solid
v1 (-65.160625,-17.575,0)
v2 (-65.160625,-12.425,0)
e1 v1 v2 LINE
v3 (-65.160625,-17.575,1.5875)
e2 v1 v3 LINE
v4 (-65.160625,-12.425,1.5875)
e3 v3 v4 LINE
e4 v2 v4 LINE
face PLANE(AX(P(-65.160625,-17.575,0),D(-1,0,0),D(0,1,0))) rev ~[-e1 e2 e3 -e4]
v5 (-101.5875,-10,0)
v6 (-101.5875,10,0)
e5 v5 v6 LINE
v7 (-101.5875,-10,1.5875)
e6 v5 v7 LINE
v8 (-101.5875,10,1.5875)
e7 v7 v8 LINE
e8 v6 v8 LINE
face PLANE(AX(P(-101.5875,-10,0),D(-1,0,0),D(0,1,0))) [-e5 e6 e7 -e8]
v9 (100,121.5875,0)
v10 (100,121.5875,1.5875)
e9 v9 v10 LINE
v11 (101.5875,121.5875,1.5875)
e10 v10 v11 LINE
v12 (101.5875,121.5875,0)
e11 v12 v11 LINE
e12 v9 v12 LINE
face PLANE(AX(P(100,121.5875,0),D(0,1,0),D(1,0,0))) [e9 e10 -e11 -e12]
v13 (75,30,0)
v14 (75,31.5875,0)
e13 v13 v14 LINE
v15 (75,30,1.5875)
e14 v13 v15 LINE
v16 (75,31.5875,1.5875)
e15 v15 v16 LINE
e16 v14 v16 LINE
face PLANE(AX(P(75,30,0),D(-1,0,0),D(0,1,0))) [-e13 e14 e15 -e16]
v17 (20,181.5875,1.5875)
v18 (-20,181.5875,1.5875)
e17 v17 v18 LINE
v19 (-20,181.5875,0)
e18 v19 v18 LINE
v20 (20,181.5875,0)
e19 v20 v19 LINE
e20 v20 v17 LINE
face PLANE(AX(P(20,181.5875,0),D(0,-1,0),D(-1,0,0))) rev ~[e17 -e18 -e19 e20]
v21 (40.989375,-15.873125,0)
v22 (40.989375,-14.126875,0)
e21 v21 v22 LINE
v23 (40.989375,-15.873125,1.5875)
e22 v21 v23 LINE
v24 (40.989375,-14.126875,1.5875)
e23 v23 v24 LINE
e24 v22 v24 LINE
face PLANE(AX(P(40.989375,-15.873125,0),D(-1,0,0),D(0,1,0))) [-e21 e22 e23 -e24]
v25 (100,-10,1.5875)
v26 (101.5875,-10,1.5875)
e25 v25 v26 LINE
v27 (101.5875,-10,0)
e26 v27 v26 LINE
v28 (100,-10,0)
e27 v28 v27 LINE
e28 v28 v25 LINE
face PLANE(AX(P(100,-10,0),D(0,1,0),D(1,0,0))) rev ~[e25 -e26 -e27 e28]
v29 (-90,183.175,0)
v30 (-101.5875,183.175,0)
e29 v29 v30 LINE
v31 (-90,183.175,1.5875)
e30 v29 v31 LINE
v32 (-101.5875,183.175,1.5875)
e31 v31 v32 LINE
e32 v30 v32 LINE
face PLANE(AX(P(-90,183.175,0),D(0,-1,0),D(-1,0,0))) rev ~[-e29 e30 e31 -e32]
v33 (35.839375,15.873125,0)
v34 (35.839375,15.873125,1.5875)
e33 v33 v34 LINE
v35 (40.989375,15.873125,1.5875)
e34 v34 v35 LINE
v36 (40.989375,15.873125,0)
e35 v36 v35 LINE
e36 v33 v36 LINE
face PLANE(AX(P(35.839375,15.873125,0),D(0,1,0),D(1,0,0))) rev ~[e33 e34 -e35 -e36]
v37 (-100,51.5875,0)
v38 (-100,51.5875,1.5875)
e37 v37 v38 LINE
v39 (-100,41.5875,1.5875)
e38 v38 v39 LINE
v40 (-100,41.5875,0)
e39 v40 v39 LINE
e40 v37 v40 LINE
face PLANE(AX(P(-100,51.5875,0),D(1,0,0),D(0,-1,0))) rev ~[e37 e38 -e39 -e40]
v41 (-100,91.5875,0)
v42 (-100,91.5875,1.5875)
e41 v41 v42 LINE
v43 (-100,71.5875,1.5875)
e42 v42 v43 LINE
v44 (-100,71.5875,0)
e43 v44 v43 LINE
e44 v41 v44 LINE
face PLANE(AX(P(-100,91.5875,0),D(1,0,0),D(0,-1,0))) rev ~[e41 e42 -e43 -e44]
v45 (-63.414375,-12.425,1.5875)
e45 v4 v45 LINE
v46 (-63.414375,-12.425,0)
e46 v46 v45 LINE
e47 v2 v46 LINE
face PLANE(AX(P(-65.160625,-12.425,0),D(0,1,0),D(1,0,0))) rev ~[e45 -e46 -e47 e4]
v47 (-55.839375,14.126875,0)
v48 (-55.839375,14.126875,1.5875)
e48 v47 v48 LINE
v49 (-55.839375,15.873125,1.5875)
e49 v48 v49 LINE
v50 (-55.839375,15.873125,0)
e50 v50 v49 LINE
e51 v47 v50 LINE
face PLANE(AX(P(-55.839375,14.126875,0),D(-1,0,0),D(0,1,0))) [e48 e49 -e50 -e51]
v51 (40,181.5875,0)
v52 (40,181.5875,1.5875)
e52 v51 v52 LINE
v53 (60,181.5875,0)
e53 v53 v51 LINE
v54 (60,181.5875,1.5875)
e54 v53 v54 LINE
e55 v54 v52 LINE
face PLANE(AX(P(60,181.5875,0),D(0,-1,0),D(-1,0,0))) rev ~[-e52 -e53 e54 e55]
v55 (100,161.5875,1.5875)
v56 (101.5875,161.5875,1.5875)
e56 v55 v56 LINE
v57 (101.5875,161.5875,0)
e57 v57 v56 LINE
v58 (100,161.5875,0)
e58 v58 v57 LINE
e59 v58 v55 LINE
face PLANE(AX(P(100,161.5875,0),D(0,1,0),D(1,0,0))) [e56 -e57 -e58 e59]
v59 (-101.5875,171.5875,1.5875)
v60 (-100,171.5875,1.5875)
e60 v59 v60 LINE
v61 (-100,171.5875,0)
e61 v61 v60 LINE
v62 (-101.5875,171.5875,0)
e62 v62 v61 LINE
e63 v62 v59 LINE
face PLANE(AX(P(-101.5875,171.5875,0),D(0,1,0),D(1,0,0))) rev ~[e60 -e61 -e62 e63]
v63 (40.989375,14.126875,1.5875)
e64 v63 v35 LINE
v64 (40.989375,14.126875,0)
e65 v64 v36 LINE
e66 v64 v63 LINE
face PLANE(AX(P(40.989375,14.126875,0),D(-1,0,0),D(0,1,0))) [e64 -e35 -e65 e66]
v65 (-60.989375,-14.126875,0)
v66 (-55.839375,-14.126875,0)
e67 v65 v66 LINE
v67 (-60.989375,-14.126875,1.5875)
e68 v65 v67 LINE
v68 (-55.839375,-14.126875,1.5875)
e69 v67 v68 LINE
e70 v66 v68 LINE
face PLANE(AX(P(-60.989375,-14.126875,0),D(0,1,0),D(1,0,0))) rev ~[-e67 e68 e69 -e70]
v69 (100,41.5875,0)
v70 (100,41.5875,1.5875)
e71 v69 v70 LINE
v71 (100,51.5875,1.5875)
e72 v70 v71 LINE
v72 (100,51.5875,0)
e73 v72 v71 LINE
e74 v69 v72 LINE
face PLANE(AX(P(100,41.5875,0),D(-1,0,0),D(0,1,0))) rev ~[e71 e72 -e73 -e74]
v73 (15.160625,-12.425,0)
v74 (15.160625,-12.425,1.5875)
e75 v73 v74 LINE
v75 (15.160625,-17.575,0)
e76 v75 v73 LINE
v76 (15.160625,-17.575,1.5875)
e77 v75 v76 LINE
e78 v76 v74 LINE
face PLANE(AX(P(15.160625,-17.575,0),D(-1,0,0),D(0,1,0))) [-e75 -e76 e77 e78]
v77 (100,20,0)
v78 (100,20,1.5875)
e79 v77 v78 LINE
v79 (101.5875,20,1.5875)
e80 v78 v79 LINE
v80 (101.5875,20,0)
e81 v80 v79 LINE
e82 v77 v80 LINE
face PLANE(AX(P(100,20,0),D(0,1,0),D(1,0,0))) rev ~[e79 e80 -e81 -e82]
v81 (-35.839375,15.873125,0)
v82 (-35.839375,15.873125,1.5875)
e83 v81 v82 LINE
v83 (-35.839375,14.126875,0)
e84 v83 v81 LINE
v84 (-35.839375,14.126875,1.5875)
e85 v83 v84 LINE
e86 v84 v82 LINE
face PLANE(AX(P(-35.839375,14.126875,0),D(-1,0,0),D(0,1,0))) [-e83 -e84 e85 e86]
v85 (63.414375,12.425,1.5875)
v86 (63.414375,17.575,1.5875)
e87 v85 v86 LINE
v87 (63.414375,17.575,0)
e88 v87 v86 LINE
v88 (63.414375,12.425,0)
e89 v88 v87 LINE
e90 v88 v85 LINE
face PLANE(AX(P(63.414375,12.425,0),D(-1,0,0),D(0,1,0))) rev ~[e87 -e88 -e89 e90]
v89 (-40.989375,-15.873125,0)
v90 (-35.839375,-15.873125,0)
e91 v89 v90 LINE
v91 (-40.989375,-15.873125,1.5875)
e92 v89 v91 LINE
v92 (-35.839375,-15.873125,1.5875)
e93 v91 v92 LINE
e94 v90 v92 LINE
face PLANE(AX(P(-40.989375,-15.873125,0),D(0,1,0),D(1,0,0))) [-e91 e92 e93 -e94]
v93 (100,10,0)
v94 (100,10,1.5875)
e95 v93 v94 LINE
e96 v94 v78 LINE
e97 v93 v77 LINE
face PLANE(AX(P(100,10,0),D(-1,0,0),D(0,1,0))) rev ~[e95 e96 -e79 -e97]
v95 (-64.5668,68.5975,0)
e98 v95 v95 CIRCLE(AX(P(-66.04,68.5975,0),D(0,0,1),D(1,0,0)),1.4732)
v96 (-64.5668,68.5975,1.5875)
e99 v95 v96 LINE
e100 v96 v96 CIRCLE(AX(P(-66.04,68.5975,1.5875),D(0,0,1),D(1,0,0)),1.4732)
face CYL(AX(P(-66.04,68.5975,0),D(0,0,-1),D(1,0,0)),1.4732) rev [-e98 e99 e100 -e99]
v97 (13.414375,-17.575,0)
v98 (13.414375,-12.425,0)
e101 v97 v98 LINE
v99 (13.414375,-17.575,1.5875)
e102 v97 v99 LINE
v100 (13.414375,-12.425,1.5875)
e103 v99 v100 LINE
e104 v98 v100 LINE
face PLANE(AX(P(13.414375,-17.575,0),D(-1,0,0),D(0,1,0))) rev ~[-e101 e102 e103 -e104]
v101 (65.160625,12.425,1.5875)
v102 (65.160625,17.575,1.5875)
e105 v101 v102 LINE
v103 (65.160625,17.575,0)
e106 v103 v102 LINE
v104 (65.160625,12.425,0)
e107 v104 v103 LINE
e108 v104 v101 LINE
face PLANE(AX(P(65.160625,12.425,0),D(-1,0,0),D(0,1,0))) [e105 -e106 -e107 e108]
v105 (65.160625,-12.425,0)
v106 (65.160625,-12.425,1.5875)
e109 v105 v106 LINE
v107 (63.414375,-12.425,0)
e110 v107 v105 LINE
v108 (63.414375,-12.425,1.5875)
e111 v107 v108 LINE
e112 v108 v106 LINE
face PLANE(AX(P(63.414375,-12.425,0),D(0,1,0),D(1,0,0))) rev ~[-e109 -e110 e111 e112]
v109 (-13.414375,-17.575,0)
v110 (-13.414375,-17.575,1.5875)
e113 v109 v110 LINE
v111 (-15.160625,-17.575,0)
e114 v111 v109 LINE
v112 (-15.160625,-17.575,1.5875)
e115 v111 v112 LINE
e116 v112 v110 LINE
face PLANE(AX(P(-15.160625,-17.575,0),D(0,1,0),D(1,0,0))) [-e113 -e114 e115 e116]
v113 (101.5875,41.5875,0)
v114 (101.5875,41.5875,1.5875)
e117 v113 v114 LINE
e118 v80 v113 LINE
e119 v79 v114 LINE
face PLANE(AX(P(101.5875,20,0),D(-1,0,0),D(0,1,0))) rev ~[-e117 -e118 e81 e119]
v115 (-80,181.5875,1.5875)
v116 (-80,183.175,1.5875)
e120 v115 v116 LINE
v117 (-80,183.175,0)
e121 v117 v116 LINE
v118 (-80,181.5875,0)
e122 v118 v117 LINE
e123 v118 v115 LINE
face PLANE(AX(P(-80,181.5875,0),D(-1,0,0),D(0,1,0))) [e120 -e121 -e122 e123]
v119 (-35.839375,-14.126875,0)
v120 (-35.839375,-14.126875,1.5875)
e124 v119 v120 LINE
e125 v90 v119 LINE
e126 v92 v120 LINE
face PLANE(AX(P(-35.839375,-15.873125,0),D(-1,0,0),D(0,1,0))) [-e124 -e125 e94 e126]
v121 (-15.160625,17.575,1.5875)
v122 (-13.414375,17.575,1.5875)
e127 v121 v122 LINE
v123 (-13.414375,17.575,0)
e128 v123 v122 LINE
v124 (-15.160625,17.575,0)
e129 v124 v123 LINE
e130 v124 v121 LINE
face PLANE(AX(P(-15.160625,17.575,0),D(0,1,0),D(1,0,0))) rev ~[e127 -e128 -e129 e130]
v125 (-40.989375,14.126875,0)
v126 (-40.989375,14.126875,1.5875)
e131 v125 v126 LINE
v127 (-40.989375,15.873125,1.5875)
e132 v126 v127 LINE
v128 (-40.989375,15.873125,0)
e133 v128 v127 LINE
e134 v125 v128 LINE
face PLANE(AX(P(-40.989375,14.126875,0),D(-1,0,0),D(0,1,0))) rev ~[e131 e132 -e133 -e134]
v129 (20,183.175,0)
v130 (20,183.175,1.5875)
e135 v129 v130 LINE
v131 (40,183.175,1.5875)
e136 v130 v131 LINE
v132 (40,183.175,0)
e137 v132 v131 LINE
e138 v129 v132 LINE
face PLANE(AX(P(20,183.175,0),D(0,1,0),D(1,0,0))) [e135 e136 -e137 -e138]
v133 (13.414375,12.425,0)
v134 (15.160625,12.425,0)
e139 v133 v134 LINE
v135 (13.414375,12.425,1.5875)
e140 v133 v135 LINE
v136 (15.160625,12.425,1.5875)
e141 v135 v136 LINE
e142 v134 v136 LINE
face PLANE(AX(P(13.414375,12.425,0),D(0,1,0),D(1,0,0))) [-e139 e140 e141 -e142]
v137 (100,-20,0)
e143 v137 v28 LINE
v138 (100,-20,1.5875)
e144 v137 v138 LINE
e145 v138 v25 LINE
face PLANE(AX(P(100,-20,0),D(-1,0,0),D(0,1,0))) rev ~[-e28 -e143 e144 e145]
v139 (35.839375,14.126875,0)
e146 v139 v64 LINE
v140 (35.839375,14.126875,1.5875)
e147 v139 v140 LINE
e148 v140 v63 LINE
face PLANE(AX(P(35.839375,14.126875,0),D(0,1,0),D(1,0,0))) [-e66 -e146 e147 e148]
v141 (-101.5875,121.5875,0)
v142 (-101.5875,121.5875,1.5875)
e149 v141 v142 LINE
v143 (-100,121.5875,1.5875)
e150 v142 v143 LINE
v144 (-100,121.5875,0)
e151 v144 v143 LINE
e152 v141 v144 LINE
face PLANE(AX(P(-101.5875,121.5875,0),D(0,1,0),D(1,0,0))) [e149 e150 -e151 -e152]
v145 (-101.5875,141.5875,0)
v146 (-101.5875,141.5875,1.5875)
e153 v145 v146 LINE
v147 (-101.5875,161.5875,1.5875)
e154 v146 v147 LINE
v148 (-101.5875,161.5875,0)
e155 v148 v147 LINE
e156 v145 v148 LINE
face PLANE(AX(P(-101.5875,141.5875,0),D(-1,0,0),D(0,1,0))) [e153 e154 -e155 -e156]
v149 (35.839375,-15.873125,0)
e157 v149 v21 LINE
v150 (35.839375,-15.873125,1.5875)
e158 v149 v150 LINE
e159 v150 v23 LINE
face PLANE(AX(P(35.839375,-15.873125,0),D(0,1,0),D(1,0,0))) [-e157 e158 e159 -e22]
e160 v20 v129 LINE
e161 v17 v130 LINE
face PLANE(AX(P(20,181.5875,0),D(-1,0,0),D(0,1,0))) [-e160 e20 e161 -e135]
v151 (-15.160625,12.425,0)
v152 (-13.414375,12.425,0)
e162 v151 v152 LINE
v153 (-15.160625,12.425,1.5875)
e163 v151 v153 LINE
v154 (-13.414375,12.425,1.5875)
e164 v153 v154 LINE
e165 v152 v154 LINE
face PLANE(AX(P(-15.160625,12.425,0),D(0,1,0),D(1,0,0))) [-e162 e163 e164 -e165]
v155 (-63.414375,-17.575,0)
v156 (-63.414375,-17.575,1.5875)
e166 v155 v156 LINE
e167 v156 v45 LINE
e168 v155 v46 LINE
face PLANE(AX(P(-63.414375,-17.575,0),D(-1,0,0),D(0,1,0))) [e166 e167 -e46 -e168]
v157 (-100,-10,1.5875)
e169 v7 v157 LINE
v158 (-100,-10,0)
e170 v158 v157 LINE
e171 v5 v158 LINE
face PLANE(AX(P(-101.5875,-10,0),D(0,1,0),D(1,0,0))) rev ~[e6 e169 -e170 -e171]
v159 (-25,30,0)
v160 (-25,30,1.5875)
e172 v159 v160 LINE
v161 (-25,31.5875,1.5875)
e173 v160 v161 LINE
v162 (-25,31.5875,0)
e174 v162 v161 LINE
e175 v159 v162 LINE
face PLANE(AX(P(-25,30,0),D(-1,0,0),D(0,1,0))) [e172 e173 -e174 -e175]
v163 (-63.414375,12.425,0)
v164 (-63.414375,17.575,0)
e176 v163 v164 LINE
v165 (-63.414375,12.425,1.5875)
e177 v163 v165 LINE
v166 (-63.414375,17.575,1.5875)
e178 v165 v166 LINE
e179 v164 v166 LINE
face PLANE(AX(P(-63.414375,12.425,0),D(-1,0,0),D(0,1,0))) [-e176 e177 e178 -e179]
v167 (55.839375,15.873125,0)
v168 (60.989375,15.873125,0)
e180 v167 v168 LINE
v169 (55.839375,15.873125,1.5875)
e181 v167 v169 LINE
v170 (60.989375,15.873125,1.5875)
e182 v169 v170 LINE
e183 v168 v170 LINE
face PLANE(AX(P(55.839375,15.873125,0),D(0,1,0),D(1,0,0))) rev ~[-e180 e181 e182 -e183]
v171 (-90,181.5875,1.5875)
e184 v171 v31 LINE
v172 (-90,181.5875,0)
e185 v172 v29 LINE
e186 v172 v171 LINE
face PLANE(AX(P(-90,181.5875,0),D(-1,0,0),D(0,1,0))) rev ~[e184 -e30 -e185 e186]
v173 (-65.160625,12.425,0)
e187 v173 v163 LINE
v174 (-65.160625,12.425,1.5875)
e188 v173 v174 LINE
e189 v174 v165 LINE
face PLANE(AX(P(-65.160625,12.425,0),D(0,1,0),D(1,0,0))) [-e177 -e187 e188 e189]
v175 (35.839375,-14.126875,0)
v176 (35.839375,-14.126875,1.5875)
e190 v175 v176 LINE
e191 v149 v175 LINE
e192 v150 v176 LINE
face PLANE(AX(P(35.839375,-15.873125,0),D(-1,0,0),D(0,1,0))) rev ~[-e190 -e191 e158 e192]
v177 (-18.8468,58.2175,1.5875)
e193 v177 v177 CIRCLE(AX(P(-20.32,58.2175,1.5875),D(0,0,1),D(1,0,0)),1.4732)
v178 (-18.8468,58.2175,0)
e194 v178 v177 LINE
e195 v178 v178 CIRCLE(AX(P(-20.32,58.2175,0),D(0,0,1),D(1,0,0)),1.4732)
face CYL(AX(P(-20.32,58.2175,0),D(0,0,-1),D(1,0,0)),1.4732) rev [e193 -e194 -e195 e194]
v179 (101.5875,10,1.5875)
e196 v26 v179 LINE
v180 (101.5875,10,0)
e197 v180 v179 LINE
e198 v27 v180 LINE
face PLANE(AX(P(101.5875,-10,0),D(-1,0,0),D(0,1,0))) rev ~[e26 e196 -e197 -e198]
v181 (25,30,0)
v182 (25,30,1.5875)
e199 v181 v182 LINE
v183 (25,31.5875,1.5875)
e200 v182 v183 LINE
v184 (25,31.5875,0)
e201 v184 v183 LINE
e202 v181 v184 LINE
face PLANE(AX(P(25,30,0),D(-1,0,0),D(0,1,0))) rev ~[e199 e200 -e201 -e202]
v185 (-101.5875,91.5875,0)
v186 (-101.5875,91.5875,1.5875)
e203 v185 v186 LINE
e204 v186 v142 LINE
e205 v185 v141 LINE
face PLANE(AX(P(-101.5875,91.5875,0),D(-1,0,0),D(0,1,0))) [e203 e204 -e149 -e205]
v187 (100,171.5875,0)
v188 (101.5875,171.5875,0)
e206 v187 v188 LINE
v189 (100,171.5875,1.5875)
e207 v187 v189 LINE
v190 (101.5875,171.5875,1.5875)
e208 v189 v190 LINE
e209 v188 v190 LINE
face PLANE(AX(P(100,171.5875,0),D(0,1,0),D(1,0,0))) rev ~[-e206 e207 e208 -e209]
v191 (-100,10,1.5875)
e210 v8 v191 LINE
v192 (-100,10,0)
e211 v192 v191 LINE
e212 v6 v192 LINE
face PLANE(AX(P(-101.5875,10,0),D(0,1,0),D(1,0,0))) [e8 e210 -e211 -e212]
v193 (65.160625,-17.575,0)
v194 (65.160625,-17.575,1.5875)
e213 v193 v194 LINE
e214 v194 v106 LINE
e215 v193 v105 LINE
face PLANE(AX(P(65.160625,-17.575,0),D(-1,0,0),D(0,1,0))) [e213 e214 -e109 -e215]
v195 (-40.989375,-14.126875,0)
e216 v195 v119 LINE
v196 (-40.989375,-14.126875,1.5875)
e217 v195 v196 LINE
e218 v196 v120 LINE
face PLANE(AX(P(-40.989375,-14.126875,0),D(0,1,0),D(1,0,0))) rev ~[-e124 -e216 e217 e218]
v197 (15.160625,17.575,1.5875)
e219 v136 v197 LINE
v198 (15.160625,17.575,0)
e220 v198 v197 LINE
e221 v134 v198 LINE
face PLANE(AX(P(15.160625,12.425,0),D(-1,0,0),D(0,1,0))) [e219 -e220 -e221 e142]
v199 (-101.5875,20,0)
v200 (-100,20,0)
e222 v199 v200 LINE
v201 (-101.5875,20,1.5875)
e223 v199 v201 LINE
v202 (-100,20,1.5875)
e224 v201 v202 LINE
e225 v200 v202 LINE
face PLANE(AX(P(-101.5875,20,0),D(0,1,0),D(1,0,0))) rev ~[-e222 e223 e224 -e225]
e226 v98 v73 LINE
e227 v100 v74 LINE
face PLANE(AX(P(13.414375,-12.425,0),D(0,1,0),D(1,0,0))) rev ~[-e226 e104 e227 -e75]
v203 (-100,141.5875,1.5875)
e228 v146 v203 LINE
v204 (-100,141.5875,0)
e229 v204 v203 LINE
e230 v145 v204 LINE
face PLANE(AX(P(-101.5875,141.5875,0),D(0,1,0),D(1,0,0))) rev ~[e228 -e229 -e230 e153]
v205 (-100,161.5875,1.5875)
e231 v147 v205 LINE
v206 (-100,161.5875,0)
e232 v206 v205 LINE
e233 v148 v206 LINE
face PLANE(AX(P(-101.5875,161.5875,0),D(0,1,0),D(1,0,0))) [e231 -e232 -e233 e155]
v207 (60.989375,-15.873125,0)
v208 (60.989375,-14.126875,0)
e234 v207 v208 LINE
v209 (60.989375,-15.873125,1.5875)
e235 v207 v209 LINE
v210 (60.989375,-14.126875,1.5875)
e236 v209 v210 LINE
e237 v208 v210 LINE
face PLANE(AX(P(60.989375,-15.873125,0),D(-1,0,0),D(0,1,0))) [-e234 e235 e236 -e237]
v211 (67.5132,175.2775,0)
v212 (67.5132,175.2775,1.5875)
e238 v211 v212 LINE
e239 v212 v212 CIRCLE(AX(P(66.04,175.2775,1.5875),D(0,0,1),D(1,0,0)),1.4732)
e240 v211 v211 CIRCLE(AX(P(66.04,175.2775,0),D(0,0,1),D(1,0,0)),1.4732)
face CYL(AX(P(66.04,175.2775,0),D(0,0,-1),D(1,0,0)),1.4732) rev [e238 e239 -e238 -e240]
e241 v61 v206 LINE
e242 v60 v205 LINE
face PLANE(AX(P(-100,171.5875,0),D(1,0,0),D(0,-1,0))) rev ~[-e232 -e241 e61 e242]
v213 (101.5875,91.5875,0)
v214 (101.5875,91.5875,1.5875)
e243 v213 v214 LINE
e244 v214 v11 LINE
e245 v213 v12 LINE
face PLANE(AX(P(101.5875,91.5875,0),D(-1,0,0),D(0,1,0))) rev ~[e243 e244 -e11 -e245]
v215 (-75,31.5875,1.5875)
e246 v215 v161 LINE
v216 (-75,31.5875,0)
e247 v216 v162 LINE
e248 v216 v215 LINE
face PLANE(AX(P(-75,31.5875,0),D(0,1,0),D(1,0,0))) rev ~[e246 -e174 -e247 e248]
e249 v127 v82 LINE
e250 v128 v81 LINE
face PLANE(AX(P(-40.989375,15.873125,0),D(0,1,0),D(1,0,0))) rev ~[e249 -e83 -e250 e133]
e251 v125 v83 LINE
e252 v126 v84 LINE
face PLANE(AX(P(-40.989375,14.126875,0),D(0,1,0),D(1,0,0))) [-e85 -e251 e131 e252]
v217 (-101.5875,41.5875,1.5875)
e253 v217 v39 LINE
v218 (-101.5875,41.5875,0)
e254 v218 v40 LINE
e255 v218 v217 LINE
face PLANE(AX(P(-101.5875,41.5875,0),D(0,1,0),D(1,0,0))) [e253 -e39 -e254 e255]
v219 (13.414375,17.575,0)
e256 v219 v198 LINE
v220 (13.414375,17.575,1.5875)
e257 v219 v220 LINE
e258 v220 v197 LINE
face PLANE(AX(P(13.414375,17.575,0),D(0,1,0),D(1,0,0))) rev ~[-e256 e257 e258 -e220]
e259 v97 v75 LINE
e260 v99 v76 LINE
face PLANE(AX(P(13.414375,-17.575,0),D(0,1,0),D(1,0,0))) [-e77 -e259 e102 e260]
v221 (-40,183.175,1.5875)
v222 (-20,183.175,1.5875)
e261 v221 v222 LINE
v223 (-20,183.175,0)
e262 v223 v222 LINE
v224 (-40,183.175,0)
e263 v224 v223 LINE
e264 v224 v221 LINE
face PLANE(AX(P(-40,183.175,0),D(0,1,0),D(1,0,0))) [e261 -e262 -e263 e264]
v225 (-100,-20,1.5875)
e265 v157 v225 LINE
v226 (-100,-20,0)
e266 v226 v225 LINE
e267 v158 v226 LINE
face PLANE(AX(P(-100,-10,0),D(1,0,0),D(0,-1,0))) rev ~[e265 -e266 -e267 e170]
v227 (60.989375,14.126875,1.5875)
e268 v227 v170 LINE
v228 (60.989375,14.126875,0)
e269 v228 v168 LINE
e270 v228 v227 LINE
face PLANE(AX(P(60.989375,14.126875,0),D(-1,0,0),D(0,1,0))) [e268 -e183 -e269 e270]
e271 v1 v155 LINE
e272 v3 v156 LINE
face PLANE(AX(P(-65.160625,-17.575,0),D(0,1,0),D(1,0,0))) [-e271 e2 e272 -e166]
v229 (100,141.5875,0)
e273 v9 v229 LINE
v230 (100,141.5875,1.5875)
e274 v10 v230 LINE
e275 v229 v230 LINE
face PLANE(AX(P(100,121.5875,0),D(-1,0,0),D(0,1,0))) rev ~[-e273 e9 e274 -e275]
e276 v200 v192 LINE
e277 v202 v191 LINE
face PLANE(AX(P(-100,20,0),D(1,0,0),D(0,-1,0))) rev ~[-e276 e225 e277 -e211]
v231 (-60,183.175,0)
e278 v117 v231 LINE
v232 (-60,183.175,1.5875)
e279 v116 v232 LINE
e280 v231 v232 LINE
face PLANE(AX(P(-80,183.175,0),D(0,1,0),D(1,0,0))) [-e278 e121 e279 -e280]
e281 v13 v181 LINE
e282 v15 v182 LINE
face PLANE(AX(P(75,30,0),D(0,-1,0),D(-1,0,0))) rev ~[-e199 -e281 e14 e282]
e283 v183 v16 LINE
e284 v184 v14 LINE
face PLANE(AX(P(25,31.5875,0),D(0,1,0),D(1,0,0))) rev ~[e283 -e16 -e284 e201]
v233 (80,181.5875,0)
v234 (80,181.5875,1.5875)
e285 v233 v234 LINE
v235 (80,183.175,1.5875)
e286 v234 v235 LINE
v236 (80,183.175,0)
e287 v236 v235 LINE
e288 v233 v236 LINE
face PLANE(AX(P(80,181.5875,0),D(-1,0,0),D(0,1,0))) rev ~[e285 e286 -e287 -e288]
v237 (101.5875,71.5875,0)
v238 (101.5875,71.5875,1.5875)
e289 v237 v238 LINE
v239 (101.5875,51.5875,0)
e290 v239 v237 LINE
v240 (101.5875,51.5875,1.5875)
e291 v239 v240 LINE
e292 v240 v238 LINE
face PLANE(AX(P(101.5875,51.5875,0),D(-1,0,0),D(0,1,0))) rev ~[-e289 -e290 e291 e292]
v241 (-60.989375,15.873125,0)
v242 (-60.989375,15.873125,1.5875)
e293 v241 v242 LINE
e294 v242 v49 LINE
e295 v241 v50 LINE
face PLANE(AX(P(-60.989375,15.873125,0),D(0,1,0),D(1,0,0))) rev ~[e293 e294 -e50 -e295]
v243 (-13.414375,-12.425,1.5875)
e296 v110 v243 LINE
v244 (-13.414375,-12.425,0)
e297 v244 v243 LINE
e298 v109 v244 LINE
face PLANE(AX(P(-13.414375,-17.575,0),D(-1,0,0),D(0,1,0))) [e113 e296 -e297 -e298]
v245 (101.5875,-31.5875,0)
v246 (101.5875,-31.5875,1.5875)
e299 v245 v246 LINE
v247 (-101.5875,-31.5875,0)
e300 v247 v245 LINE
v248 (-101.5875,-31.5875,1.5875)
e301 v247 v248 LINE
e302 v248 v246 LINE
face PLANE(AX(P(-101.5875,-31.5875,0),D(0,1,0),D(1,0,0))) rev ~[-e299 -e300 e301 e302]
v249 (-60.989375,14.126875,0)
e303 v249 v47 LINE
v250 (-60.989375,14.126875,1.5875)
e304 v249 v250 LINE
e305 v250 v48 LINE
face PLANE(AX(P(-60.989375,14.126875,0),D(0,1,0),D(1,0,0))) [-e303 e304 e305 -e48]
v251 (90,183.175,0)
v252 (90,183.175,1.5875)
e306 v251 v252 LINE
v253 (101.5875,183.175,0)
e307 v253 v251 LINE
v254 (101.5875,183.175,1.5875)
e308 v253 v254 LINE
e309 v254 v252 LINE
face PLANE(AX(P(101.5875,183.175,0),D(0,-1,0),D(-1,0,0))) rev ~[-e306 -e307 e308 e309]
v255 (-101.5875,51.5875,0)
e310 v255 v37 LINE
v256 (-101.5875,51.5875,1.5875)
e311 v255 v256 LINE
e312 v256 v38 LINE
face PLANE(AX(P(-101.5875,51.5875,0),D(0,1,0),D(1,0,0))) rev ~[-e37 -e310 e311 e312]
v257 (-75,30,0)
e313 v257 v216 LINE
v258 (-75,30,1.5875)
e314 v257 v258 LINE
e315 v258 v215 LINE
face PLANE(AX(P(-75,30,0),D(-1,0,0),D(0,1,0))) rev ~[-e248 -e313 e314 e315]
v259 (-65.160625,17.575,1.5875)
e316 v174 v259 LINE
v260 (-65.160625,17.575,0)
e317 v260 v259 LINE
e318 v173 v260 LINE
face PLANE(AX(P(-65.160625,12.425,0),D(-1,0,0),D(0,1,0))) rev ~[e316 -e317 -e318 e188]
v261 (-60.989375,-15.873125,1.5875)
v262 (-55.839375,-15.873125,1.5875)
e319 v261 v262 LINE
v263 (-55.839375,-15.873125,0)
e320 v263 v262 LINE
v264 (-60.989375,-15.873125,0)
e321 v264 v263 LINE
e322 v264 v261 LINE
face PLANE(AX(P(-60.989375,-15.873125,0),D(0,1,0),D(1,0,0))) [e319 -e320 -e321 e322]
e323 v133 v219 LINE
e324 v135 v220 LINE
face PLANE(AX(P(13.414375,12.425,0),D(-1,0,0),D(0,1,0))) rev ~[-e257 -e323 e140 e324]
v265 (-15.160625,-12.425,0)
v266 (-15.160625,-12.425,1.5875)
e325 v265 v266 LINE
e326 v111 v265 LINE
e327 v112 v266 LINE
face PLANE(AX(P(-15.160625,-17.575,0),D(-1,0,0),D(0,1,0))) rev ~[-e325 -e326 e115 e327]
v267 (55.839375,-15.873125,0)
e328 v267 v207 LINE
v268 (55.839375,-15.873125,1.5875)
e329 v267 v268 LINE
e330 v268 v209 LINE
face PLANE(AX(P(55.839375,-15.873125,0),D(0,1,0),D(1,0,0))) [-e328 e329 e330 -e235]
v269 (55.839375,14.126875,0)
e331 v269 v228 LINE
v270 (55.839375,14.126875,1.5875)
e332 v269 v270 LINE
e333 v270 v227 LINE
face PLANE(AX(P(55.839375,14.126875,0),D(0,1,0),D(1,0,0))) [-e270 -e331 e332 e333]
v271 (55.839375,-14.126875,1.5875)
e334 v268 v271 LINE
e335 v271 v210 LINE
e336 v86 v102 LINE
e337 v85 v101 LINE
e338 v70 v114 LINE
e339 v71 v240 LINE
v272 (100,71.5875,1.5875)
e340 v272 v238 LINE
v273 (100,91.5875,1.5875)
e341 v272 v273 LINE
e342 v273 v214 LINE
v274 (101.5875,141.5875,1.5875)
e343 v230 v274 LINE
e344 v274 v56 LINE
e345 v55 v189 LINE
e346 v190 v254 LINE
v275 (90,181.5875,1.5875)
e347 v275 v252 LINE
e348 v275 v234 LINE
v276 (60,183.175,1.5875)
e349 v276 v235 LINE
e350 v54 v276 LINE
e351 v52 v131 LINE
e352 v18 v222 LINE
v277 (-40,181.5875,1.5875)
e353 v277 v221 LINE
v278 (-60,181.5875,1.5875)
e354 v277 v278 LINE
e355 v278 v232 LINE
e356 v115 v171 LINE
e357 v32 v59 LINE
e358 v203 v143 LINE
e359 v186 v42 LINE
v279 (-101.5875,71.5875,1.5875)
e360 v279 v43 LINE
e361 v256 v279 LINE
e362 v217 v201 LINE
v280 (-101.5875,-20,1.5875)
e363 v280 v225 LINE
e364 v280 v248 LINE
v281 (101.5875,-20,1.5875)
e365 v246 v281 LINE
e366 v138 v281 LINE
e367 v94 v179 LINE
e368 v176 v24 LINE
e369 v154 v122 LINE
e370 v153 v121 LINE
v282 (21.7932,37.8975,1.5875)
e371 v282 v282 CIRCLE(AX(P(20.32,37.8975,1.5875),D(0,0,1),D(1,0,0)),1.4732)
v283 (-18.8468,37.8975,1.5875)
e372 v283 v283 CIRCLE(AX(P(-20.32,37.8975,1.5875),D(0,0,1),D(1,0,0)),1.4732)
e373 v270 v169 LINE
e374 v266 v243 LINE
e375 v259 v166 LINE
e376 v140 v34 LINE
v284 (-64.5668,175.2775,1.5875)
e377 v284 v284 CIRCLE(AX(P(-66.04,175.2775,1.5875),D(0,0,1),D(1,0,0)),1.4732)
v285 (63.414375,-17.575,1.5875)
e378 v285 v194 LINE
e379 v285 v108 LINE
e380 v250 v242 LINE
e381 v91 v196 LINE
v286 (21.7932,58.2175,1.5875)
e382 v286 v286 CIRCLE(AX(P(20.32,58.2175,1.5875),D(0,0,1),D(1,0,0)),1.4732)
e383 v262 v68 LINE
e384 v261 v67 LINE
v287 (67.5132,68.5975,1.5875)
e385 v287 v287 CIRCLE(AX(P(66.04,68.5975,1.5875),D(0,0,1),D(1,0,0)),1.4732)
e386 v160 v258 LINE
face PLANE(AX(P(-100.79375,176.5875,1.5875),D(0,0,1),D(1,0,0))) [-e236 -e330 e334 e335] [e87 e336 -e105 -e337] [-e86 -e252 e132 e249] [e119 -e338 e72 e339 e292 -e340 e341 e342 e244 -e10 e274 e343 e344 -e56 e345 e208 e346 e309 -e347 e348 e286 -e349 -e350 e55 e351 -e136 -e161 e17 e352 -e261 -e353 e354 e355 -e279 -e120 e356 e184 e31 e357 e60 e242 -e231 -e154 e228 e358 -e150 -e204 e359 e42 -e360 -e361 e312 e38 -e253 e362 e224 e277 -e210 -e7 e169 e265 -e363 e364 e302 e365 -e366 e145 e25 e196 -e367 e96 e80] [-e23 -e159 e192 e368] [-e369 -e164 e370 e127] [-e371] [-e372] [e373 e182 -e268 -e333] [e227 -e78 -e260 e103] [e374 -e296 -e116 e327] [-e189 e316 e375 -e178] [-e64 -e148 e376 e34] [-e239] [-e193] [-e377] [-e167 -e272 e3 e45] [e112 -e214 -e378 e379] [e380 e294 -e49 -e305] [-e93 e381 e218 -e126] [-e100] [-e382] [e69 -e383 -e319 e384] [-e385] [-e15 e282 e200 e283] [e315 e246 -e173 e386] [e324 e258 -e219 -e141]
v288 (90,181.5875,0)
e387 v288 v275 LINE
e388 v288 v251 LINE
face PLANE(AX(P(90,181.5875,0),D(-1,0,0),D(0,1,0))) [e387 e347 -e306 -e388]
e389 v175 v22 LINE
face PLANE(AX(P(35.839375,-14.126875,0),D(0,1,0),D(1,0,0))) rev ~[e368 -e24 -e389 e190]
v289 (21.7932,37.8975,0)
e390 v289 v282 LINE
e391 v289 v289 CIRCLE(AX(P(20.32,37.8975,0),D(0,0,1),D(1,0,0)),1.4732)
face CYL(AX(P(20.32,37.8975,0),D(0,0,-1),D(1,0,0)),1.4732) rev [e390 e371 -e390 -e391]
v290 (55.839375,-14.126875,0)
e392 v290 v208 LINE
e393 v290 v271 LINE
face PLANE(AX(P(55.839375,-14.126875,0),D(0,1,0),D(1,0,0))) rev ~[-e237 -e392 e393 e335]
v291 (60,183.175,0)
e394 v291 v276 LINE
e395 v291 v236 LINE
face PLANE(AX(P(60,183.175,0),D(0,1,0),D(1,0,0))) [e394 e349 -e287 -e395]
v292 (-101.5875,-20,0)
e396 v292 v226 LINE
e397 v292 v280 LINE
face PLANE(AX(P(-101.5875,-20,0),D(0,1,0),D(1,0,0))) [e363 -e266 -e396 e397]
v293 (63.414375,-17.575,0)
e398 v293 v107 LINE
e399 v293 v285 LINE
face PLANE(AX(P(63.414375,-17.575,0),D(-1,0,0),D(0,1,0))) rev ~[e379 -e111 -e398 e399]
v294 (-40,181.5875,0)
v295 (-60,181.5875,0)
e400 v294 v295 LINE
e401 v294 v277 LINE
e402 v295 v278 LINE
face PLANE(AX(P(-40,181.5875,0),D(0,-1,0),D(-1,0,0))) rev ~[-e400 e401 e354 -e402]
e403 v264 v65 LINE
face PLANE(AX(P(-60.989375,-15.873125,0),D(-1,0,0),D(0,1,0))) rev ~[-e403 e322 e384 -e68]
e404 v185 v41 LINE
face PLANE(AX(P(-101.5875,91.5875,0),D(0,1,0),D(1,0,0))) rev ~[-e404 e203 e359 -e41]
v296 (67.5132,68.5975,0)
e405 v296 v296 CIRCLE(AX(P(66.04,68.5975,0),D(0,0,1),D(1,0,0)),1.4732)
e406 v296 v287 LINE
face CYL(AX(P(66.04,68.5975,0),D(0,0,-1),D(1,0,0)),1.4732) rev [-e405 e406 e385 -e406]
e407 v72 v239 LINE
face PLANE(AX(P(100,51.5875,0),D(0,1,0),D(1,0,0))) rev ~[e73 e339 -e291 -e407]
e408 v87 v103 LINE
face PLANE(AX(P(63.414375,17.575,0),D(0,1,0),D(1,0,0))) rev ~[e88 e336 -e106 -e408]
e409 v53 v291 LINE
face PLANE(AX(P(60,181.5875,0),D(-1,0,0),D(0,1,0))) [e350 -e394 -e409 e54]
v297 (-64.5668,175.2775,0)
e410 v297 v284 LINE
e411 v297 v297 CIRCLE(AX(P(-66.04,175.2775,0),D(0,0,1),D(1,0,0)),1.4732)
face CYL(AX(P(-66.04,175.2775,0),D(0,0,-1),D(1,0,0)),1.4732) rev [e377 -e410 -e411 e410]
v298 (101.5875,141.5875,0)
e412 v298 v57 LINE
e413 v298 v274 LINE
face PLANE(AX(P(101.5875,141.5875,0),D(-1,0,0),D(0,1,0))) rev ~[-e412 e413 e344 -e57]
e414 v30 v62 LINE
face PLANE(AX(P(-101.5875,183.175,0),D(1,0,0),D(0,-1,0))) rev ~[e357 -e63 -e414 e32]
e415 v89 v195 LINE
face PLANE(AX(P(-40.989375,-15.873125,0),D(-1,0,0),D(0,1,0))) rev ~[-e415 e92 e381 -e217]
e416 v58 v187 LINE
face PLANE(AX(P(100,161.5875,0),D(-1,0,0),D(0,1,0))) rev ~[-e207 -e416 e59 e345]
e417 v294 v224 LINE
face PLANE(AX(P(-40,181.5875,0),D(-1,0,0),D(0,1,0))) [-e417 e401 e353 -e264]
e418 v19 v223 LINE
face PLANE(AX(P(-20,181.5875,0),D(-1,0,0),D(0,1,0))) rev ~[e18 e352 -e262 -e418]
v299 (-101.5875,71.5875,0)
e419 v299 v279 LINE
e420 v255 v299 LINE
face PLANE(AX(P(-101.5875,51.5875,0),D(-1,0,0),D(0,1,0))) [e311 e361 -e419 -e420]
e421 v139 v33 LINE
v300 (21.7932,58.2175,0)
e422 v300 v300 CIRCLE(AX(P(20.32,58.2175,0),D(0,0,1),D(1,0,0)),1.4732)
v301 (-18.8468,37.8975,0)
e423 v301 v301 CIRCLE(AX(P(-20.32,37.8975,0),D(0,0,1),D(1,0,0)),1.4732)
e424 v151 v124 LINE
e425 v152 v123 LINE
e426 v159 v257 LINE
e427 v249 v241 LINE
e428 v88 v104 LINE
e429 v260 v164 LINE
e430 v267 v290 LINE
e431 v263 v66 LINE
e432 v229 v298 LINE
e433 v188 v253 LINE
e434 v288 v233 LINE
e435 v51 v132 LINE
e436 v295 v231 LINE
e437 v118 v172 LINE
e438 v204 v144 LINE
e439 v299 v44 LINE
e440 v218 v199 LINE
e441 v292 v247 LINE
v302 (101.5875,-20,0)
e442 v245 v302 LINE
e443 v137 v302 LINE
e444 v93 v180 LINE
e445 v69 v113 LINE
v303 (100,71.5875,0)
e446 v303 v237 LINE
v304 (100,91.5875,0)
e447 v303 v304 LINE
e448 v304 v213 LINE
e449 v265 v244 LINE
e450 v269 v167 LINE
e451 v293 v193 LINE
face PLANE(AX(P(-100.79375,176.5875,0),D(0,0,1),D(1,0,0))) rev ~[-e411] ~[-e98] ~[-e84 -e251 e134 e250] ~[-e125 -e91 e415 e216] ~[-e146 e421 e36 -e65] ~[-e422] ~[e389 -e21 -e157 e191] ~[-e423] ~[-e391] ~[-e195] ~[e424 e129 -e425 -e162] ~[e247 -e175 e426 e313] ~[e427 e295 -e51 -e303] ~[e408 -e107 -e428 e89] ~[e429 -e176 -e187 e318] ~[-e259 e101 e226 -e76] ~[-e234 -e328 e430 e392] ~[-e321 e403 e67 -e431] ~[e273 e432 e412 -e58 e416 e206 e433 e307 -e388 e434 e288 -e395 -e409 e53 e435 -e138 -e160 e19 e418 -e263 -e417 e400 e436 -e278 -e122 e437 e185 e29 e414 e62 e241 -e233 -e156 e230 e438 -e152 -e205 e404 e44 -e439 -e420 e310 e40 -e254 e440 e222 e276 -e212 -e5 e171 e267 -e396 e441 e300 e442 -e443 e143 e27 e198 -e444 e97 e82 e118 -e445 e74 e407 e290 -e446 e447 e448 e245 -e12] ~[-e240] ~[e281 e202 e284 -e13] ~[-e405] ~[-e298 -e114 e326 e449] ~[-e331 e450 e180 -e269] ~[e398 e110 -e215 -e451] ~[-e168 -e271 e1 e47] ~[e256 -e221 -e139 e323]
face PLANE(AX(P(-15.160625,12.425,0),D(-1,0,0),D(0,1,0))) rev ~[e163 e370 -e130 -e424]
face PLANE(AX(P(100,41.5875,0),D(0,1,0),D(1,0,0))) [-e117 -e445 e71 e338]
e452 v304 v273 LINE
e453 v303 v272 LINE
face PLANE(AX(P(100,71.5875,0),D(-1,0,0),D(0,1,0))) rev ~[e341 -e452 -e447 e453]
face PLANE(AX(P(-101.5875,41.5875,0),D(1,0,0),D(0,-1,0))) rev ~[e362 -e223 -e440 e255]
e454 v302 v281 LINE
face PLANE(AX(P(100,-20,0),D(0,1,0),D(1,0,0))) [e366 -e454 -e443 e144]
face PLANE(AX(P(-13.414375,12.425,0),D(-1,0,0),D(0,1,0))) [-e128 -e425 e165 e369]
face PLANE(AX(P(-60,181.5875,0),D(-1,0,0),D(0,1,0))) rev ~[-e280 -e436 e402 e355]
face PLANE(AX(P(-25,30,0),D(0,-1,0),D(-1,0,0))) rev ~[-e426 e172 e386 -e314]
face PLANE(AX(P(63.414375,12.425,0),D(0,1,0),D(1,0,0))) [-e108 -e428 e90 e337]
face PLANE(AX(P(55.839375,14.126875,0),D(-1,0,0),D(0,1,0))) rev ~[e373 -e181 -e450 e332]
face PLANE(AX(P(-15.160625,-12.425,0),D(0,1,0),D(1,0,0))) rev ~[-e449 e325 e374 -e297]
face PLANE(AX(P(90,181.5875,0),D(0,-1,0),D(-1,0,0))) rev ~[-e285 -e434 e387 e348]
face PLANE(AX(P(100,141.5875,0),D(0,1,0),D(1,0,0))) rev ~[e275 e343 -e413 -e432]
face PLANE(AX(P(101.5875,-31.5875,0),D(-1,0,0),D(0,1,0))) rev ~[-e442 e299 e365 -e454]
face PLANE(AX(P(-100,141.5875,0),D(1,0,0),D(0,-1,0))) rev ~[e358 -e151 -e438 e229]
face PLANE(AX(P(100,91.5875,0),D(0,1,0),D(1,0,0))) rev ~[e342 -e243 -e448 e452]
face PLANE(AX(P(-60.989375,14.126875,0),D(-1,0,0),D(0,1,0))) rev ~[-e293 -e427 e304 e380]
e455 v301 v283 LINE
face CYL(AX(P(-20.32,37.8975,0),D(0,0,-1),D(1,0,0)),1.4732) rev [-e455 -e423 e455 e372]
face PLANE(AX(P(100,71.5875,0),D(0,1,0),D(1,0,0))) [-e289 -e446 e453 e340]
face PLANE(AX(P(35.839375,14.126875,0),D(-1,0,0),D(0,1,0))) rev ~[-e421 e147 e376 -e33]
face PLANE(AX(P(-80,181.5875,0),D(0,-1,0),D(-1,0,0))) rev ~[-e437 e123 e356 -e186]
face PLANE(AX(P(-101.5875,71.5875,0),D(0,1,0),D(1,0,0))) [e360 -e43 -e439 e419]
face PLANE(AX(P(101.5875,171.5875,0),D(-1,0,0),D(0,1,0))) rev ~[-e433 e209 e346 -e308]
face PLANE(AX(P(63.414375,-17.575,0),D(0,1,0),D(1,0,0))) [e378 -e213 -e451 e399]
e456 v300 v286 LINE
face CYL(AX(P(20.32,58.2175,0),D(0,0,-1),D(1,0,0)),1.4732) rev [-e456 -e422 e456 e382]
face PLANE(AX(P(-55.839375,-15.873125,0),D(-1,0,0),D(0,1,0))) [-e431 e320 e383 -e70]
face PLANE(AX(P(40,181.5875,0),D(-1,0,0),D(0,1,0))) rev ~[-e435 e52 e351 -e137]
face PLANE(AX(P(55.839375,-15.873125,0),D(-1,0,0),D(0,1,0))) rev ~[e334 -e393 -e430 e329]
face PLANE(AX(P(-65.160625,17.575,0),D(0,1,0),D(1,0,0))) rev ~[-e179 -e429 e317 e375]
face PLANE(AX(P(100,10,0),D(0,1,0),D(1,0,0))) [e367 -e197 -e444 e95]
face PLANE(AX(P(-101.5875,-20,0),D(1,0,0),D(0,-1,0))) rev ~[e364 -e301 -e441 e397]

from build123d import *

# Parameters (mm, degrees)
F0_W     = 1.5875
F0_H     = 10
F0_H_2   = 20
F0_W_2   = 1.74625
F0_H_3   = 5.15
F0_W_3   = 5.15
F0_H_4   = 1.74625
F0_W_4   = 200
F0_H_5   = 1.5875
F0_W_5   = 50
F0_R     = 1.4732
F0_W_6   = 25
F0_H_6   = 30
F0_W_7   = 10
F0_W_8   = 20
F1_DEPTH = 1.5875


# Not quite as in the source:
# - a length typed as a fraction of an inch, garbled in the dataset ("3 / 203.2 mm" for 3/8 in), is restored


with BuildPart() as f1:
    # F0 (on Top) → F1 (new body)
    with BuildSketch(Plane.XY):
        with Locations((-100.79375, 176.5875)):
            Rectangle(F0_W, F0_H)
        with Locations((-100.79375, 36.5875)):
            Rectangle(F0_W, F0_H)
        with Locations((-100.79375, 61.5875)):
            Rectangle(F0_W, F0_H_2)
        with Locations((100.79375, 176.5875)):
            Rectangle(F0_W, F0_H)
        with Locations((100.79375, 36.5875)):
            Rectangle(F0_W, F0_H)
        with Locations((100.79375, 61.5875)):
            Rectangle(F0_W, F0_H_2)
        Polygon((100, 10), (100, 20), (-100, 20), (-100, 10), (-100, -10), (-100, -20), (100, -20), (100, -10), align=None)
        with Locations((-64.2875, -15)):
            Rectangle(F0_W_2, F0_H_3, mode=Mode.SUBTRACT)
        with Locations((-58.414375, -15)):
            Rectangle(F0_W_3, F0_H_4, mode=Mode.SUBTRACT)
        with Locations((-64.2875, 15)):
            Rectangle(F0_W_2, F0_H_3, mode=Mode.SUBTRACT)
        with Locations((-58.414375, 15)):
            Rectangle(F0_W_3, F0_H_4, mode=Mode.SUBTRACT)
        with Locations((-38.414375, -15)):
            Rectangle(F0_W_3, F0_H_4, mode=Mode.SUBTRACT)
        with Locations((-14.2875, -15)):
            Rectangle(F0_W_2, F0_H_3, mode=Mode.SUBTRACT)
        with Locations((-38.414375, 15)):
            Rectangle(F0_W_3, F0_H_4, mode=Mode.SUBTRACT)
        with Locations((-14.2875, 15)):
            Rectangle(F0_W_2, F0_H_3, mode=Mode.SUBTRACT)
        with Locations((14.2875, -15)):
            Rectangle(F0_W_2, F0_H_3, mode=Mode.SUBTRACT)
        with Locations((38.414375, -15)):
            Rectangle(F0_W_3, F0_H_4, mode=Mode.SUBTRACT)
        with Locations((14.2875, 15)):
            Rectangle(F0_W_2, F0_H_3, mode=Mode.SUBTRACT)
        with Locations((38.414375, 15)):
            Rectangle(F0_W_3, F0_H_4, mode=Mode.SUBTRACT)
        with Locations((58.414375, -15)):
            Rectangle(F0_W_3, F0_H_4, mode=Mode.SUBTRACT)
        with Locations((64.2875, -15)):
            Rectangle(F0_W_2, F0_H_3, mode=Mode.SUBTRACT)
        with Locations((58.414375, 15)):
            Rectangle(F0_W_3, F0_H_4, mode=Mode.SUBTRACT)
        with Locations((64.2875, 15)):
            Rectangle(F0_W_2, F0_H_3, mode=Mode.SUBTRACT)
        Polygon((-100, 20), (100, 20), (100, 30), (75, 30), (25, 30), (-25, 30), (-75, 30), (-100, 30), align=None)
        with Locations((0, -25)):
            Rectangle(F0_W_4, F0_H)
        with Locations((-100.79375, 0)):
            Rectangle(F0_W, F0_H_2)
        with Locations((100.79375, 0)):
            Rectangle(F0_W, F0_H_2)
        with Locations((100.79375, 25)):
            Rectangle(F0_W, F0_H)
        with Locations((100.79375, -25)):
            Rectangle(F0_W, F0_H)
        with Locations((-100.79375, 25)):
            Rectangle(F0_W, F0_H)
        with Locations((-100.79375, -25)):
            Rectangle(F0_W, F0_H)
        Polygon((101.5875, -30), (100, -30), (-100, -30), (-100, -31.5875), (101.5875, -31.5875), align=None)
        with Locations((-100.79375, 30.79375)):
            Rectangle(F0_W, F0_H_5)
        with Locations((0, 30.79375)):
            Rectangle(F0_W_5, F0_H_5)
        with Locations((100.79375, 30.79375)):
            Rectangle(F0_W, F0_H_5)
        with Locations((-100.79375, -30.79375)):
            Rectangle(F0_W, F0_H_5)
        Polygon((75, 31.5875), (100, 31.5875), (100, 41.5875), (100, 51.5875), (100, 71.5875), (100, 91.5875), (100, 121.5875), (100, 141.5875), (100, 161.5875), (100, 171.5875), (100, 181.5875), (90, 181.5875), (80, 181.5875), (60, 181.5875), (40, 181.5875), (20, 181.5875), (-20, 181.5875), (-40, 181.5875), (-60, 181.5875), (-80, 181.5875), (-90, 181.5875), (-100, 181.5875), (-100, 171.5875), (-100, 161.5875), (-100, 141.5875), (-100, 121.5875), (-100, 91.5875), (-100, 71.5875), (-100, 51.5875), (-100, 41.5875), (-100, 31.5875), (-75, 31.5875), (-25, 31.5875), (25, 31.5875), align=None)
        with Locations((-66.04, 68.5975)):
            Circle(F0_R, mode=Mode.SUBTRACT)
        with Locations((-20.32, 37.8975)):
            Circle(F0_R, mode=Mode.SUBTRACT)
        with Locations((-20.32, 58.2175)):
            Circle(F0_R, mode=Mode.SUBTRACT)
        with Locations((20.32, 37.8975)):
            Circle(F0_R, mode=Mode.SUBTRACT)
        with Locations((20.32, 58.2175)):
            Circle(F0_R, mode=Mode.SUBTRACT)
        with Locations((66.04, 68.5975)):
            Circle(F0_R, mode=Mode.SUBTRACT)
        with Locations((-66.04, 175.2775)):
            Circle(F0_R, mode=Mode.SUBTRACT)
        with Locations((66.04, 175.2775)):
            Circle(F0_R, mode=Mode.SUBTRACT)
        with Locations((87.5, 30.79375)):
            Rectangle(F0_W_6, F0_H_5)
        with Locations((-87.5, 30.79375)):
            Rectangle(F0_W_6, F0_H_5)
        with Locations((-100.79375, 106.5875)):
            Rectangle(F0_W, F0_H_6)
        with Locations((-100.79375, 151.5875)):
            Rectangle(F0_W, F0_H_2)
        with Locations((100.79375, 151.5875)):
            Rectangle(F0_W, F0_H_2)
        with Locations((100.79375, 106.5875)):
            Rectangle(F0_W, F0_H_6)
        with Locations((95, 182.38125)):
            Rectangle(F0_W_7, F0_H_5)
        with Locations((100.79375, 182.38125)):
            Rectangle(F0_W, F0_H_5)
        with Locations((-100.79375, 182.38125)):
            Rectangle(F0_W, F0_H_5)
        with Locations((-95, 182.38125)):
            Rectangle(F0_W_7, F0_H_5)
        with Locations((-70, 182.38125)):
            Rectangle(F0_W_8, F0_H_5)
        with Locations((-30, 182.38125)):
            Rectangle(F0_W_8, F0_H_5)
        with Locations((70, 182.38125)):
            Rectangle(F0_W_8, F0_H_5)
        with Locations((30, 182.38125)):
            Rectangle(F0_W_8, F0_H_5)
    extrude(amount=F1_DEPTH)


solid = f1.part
